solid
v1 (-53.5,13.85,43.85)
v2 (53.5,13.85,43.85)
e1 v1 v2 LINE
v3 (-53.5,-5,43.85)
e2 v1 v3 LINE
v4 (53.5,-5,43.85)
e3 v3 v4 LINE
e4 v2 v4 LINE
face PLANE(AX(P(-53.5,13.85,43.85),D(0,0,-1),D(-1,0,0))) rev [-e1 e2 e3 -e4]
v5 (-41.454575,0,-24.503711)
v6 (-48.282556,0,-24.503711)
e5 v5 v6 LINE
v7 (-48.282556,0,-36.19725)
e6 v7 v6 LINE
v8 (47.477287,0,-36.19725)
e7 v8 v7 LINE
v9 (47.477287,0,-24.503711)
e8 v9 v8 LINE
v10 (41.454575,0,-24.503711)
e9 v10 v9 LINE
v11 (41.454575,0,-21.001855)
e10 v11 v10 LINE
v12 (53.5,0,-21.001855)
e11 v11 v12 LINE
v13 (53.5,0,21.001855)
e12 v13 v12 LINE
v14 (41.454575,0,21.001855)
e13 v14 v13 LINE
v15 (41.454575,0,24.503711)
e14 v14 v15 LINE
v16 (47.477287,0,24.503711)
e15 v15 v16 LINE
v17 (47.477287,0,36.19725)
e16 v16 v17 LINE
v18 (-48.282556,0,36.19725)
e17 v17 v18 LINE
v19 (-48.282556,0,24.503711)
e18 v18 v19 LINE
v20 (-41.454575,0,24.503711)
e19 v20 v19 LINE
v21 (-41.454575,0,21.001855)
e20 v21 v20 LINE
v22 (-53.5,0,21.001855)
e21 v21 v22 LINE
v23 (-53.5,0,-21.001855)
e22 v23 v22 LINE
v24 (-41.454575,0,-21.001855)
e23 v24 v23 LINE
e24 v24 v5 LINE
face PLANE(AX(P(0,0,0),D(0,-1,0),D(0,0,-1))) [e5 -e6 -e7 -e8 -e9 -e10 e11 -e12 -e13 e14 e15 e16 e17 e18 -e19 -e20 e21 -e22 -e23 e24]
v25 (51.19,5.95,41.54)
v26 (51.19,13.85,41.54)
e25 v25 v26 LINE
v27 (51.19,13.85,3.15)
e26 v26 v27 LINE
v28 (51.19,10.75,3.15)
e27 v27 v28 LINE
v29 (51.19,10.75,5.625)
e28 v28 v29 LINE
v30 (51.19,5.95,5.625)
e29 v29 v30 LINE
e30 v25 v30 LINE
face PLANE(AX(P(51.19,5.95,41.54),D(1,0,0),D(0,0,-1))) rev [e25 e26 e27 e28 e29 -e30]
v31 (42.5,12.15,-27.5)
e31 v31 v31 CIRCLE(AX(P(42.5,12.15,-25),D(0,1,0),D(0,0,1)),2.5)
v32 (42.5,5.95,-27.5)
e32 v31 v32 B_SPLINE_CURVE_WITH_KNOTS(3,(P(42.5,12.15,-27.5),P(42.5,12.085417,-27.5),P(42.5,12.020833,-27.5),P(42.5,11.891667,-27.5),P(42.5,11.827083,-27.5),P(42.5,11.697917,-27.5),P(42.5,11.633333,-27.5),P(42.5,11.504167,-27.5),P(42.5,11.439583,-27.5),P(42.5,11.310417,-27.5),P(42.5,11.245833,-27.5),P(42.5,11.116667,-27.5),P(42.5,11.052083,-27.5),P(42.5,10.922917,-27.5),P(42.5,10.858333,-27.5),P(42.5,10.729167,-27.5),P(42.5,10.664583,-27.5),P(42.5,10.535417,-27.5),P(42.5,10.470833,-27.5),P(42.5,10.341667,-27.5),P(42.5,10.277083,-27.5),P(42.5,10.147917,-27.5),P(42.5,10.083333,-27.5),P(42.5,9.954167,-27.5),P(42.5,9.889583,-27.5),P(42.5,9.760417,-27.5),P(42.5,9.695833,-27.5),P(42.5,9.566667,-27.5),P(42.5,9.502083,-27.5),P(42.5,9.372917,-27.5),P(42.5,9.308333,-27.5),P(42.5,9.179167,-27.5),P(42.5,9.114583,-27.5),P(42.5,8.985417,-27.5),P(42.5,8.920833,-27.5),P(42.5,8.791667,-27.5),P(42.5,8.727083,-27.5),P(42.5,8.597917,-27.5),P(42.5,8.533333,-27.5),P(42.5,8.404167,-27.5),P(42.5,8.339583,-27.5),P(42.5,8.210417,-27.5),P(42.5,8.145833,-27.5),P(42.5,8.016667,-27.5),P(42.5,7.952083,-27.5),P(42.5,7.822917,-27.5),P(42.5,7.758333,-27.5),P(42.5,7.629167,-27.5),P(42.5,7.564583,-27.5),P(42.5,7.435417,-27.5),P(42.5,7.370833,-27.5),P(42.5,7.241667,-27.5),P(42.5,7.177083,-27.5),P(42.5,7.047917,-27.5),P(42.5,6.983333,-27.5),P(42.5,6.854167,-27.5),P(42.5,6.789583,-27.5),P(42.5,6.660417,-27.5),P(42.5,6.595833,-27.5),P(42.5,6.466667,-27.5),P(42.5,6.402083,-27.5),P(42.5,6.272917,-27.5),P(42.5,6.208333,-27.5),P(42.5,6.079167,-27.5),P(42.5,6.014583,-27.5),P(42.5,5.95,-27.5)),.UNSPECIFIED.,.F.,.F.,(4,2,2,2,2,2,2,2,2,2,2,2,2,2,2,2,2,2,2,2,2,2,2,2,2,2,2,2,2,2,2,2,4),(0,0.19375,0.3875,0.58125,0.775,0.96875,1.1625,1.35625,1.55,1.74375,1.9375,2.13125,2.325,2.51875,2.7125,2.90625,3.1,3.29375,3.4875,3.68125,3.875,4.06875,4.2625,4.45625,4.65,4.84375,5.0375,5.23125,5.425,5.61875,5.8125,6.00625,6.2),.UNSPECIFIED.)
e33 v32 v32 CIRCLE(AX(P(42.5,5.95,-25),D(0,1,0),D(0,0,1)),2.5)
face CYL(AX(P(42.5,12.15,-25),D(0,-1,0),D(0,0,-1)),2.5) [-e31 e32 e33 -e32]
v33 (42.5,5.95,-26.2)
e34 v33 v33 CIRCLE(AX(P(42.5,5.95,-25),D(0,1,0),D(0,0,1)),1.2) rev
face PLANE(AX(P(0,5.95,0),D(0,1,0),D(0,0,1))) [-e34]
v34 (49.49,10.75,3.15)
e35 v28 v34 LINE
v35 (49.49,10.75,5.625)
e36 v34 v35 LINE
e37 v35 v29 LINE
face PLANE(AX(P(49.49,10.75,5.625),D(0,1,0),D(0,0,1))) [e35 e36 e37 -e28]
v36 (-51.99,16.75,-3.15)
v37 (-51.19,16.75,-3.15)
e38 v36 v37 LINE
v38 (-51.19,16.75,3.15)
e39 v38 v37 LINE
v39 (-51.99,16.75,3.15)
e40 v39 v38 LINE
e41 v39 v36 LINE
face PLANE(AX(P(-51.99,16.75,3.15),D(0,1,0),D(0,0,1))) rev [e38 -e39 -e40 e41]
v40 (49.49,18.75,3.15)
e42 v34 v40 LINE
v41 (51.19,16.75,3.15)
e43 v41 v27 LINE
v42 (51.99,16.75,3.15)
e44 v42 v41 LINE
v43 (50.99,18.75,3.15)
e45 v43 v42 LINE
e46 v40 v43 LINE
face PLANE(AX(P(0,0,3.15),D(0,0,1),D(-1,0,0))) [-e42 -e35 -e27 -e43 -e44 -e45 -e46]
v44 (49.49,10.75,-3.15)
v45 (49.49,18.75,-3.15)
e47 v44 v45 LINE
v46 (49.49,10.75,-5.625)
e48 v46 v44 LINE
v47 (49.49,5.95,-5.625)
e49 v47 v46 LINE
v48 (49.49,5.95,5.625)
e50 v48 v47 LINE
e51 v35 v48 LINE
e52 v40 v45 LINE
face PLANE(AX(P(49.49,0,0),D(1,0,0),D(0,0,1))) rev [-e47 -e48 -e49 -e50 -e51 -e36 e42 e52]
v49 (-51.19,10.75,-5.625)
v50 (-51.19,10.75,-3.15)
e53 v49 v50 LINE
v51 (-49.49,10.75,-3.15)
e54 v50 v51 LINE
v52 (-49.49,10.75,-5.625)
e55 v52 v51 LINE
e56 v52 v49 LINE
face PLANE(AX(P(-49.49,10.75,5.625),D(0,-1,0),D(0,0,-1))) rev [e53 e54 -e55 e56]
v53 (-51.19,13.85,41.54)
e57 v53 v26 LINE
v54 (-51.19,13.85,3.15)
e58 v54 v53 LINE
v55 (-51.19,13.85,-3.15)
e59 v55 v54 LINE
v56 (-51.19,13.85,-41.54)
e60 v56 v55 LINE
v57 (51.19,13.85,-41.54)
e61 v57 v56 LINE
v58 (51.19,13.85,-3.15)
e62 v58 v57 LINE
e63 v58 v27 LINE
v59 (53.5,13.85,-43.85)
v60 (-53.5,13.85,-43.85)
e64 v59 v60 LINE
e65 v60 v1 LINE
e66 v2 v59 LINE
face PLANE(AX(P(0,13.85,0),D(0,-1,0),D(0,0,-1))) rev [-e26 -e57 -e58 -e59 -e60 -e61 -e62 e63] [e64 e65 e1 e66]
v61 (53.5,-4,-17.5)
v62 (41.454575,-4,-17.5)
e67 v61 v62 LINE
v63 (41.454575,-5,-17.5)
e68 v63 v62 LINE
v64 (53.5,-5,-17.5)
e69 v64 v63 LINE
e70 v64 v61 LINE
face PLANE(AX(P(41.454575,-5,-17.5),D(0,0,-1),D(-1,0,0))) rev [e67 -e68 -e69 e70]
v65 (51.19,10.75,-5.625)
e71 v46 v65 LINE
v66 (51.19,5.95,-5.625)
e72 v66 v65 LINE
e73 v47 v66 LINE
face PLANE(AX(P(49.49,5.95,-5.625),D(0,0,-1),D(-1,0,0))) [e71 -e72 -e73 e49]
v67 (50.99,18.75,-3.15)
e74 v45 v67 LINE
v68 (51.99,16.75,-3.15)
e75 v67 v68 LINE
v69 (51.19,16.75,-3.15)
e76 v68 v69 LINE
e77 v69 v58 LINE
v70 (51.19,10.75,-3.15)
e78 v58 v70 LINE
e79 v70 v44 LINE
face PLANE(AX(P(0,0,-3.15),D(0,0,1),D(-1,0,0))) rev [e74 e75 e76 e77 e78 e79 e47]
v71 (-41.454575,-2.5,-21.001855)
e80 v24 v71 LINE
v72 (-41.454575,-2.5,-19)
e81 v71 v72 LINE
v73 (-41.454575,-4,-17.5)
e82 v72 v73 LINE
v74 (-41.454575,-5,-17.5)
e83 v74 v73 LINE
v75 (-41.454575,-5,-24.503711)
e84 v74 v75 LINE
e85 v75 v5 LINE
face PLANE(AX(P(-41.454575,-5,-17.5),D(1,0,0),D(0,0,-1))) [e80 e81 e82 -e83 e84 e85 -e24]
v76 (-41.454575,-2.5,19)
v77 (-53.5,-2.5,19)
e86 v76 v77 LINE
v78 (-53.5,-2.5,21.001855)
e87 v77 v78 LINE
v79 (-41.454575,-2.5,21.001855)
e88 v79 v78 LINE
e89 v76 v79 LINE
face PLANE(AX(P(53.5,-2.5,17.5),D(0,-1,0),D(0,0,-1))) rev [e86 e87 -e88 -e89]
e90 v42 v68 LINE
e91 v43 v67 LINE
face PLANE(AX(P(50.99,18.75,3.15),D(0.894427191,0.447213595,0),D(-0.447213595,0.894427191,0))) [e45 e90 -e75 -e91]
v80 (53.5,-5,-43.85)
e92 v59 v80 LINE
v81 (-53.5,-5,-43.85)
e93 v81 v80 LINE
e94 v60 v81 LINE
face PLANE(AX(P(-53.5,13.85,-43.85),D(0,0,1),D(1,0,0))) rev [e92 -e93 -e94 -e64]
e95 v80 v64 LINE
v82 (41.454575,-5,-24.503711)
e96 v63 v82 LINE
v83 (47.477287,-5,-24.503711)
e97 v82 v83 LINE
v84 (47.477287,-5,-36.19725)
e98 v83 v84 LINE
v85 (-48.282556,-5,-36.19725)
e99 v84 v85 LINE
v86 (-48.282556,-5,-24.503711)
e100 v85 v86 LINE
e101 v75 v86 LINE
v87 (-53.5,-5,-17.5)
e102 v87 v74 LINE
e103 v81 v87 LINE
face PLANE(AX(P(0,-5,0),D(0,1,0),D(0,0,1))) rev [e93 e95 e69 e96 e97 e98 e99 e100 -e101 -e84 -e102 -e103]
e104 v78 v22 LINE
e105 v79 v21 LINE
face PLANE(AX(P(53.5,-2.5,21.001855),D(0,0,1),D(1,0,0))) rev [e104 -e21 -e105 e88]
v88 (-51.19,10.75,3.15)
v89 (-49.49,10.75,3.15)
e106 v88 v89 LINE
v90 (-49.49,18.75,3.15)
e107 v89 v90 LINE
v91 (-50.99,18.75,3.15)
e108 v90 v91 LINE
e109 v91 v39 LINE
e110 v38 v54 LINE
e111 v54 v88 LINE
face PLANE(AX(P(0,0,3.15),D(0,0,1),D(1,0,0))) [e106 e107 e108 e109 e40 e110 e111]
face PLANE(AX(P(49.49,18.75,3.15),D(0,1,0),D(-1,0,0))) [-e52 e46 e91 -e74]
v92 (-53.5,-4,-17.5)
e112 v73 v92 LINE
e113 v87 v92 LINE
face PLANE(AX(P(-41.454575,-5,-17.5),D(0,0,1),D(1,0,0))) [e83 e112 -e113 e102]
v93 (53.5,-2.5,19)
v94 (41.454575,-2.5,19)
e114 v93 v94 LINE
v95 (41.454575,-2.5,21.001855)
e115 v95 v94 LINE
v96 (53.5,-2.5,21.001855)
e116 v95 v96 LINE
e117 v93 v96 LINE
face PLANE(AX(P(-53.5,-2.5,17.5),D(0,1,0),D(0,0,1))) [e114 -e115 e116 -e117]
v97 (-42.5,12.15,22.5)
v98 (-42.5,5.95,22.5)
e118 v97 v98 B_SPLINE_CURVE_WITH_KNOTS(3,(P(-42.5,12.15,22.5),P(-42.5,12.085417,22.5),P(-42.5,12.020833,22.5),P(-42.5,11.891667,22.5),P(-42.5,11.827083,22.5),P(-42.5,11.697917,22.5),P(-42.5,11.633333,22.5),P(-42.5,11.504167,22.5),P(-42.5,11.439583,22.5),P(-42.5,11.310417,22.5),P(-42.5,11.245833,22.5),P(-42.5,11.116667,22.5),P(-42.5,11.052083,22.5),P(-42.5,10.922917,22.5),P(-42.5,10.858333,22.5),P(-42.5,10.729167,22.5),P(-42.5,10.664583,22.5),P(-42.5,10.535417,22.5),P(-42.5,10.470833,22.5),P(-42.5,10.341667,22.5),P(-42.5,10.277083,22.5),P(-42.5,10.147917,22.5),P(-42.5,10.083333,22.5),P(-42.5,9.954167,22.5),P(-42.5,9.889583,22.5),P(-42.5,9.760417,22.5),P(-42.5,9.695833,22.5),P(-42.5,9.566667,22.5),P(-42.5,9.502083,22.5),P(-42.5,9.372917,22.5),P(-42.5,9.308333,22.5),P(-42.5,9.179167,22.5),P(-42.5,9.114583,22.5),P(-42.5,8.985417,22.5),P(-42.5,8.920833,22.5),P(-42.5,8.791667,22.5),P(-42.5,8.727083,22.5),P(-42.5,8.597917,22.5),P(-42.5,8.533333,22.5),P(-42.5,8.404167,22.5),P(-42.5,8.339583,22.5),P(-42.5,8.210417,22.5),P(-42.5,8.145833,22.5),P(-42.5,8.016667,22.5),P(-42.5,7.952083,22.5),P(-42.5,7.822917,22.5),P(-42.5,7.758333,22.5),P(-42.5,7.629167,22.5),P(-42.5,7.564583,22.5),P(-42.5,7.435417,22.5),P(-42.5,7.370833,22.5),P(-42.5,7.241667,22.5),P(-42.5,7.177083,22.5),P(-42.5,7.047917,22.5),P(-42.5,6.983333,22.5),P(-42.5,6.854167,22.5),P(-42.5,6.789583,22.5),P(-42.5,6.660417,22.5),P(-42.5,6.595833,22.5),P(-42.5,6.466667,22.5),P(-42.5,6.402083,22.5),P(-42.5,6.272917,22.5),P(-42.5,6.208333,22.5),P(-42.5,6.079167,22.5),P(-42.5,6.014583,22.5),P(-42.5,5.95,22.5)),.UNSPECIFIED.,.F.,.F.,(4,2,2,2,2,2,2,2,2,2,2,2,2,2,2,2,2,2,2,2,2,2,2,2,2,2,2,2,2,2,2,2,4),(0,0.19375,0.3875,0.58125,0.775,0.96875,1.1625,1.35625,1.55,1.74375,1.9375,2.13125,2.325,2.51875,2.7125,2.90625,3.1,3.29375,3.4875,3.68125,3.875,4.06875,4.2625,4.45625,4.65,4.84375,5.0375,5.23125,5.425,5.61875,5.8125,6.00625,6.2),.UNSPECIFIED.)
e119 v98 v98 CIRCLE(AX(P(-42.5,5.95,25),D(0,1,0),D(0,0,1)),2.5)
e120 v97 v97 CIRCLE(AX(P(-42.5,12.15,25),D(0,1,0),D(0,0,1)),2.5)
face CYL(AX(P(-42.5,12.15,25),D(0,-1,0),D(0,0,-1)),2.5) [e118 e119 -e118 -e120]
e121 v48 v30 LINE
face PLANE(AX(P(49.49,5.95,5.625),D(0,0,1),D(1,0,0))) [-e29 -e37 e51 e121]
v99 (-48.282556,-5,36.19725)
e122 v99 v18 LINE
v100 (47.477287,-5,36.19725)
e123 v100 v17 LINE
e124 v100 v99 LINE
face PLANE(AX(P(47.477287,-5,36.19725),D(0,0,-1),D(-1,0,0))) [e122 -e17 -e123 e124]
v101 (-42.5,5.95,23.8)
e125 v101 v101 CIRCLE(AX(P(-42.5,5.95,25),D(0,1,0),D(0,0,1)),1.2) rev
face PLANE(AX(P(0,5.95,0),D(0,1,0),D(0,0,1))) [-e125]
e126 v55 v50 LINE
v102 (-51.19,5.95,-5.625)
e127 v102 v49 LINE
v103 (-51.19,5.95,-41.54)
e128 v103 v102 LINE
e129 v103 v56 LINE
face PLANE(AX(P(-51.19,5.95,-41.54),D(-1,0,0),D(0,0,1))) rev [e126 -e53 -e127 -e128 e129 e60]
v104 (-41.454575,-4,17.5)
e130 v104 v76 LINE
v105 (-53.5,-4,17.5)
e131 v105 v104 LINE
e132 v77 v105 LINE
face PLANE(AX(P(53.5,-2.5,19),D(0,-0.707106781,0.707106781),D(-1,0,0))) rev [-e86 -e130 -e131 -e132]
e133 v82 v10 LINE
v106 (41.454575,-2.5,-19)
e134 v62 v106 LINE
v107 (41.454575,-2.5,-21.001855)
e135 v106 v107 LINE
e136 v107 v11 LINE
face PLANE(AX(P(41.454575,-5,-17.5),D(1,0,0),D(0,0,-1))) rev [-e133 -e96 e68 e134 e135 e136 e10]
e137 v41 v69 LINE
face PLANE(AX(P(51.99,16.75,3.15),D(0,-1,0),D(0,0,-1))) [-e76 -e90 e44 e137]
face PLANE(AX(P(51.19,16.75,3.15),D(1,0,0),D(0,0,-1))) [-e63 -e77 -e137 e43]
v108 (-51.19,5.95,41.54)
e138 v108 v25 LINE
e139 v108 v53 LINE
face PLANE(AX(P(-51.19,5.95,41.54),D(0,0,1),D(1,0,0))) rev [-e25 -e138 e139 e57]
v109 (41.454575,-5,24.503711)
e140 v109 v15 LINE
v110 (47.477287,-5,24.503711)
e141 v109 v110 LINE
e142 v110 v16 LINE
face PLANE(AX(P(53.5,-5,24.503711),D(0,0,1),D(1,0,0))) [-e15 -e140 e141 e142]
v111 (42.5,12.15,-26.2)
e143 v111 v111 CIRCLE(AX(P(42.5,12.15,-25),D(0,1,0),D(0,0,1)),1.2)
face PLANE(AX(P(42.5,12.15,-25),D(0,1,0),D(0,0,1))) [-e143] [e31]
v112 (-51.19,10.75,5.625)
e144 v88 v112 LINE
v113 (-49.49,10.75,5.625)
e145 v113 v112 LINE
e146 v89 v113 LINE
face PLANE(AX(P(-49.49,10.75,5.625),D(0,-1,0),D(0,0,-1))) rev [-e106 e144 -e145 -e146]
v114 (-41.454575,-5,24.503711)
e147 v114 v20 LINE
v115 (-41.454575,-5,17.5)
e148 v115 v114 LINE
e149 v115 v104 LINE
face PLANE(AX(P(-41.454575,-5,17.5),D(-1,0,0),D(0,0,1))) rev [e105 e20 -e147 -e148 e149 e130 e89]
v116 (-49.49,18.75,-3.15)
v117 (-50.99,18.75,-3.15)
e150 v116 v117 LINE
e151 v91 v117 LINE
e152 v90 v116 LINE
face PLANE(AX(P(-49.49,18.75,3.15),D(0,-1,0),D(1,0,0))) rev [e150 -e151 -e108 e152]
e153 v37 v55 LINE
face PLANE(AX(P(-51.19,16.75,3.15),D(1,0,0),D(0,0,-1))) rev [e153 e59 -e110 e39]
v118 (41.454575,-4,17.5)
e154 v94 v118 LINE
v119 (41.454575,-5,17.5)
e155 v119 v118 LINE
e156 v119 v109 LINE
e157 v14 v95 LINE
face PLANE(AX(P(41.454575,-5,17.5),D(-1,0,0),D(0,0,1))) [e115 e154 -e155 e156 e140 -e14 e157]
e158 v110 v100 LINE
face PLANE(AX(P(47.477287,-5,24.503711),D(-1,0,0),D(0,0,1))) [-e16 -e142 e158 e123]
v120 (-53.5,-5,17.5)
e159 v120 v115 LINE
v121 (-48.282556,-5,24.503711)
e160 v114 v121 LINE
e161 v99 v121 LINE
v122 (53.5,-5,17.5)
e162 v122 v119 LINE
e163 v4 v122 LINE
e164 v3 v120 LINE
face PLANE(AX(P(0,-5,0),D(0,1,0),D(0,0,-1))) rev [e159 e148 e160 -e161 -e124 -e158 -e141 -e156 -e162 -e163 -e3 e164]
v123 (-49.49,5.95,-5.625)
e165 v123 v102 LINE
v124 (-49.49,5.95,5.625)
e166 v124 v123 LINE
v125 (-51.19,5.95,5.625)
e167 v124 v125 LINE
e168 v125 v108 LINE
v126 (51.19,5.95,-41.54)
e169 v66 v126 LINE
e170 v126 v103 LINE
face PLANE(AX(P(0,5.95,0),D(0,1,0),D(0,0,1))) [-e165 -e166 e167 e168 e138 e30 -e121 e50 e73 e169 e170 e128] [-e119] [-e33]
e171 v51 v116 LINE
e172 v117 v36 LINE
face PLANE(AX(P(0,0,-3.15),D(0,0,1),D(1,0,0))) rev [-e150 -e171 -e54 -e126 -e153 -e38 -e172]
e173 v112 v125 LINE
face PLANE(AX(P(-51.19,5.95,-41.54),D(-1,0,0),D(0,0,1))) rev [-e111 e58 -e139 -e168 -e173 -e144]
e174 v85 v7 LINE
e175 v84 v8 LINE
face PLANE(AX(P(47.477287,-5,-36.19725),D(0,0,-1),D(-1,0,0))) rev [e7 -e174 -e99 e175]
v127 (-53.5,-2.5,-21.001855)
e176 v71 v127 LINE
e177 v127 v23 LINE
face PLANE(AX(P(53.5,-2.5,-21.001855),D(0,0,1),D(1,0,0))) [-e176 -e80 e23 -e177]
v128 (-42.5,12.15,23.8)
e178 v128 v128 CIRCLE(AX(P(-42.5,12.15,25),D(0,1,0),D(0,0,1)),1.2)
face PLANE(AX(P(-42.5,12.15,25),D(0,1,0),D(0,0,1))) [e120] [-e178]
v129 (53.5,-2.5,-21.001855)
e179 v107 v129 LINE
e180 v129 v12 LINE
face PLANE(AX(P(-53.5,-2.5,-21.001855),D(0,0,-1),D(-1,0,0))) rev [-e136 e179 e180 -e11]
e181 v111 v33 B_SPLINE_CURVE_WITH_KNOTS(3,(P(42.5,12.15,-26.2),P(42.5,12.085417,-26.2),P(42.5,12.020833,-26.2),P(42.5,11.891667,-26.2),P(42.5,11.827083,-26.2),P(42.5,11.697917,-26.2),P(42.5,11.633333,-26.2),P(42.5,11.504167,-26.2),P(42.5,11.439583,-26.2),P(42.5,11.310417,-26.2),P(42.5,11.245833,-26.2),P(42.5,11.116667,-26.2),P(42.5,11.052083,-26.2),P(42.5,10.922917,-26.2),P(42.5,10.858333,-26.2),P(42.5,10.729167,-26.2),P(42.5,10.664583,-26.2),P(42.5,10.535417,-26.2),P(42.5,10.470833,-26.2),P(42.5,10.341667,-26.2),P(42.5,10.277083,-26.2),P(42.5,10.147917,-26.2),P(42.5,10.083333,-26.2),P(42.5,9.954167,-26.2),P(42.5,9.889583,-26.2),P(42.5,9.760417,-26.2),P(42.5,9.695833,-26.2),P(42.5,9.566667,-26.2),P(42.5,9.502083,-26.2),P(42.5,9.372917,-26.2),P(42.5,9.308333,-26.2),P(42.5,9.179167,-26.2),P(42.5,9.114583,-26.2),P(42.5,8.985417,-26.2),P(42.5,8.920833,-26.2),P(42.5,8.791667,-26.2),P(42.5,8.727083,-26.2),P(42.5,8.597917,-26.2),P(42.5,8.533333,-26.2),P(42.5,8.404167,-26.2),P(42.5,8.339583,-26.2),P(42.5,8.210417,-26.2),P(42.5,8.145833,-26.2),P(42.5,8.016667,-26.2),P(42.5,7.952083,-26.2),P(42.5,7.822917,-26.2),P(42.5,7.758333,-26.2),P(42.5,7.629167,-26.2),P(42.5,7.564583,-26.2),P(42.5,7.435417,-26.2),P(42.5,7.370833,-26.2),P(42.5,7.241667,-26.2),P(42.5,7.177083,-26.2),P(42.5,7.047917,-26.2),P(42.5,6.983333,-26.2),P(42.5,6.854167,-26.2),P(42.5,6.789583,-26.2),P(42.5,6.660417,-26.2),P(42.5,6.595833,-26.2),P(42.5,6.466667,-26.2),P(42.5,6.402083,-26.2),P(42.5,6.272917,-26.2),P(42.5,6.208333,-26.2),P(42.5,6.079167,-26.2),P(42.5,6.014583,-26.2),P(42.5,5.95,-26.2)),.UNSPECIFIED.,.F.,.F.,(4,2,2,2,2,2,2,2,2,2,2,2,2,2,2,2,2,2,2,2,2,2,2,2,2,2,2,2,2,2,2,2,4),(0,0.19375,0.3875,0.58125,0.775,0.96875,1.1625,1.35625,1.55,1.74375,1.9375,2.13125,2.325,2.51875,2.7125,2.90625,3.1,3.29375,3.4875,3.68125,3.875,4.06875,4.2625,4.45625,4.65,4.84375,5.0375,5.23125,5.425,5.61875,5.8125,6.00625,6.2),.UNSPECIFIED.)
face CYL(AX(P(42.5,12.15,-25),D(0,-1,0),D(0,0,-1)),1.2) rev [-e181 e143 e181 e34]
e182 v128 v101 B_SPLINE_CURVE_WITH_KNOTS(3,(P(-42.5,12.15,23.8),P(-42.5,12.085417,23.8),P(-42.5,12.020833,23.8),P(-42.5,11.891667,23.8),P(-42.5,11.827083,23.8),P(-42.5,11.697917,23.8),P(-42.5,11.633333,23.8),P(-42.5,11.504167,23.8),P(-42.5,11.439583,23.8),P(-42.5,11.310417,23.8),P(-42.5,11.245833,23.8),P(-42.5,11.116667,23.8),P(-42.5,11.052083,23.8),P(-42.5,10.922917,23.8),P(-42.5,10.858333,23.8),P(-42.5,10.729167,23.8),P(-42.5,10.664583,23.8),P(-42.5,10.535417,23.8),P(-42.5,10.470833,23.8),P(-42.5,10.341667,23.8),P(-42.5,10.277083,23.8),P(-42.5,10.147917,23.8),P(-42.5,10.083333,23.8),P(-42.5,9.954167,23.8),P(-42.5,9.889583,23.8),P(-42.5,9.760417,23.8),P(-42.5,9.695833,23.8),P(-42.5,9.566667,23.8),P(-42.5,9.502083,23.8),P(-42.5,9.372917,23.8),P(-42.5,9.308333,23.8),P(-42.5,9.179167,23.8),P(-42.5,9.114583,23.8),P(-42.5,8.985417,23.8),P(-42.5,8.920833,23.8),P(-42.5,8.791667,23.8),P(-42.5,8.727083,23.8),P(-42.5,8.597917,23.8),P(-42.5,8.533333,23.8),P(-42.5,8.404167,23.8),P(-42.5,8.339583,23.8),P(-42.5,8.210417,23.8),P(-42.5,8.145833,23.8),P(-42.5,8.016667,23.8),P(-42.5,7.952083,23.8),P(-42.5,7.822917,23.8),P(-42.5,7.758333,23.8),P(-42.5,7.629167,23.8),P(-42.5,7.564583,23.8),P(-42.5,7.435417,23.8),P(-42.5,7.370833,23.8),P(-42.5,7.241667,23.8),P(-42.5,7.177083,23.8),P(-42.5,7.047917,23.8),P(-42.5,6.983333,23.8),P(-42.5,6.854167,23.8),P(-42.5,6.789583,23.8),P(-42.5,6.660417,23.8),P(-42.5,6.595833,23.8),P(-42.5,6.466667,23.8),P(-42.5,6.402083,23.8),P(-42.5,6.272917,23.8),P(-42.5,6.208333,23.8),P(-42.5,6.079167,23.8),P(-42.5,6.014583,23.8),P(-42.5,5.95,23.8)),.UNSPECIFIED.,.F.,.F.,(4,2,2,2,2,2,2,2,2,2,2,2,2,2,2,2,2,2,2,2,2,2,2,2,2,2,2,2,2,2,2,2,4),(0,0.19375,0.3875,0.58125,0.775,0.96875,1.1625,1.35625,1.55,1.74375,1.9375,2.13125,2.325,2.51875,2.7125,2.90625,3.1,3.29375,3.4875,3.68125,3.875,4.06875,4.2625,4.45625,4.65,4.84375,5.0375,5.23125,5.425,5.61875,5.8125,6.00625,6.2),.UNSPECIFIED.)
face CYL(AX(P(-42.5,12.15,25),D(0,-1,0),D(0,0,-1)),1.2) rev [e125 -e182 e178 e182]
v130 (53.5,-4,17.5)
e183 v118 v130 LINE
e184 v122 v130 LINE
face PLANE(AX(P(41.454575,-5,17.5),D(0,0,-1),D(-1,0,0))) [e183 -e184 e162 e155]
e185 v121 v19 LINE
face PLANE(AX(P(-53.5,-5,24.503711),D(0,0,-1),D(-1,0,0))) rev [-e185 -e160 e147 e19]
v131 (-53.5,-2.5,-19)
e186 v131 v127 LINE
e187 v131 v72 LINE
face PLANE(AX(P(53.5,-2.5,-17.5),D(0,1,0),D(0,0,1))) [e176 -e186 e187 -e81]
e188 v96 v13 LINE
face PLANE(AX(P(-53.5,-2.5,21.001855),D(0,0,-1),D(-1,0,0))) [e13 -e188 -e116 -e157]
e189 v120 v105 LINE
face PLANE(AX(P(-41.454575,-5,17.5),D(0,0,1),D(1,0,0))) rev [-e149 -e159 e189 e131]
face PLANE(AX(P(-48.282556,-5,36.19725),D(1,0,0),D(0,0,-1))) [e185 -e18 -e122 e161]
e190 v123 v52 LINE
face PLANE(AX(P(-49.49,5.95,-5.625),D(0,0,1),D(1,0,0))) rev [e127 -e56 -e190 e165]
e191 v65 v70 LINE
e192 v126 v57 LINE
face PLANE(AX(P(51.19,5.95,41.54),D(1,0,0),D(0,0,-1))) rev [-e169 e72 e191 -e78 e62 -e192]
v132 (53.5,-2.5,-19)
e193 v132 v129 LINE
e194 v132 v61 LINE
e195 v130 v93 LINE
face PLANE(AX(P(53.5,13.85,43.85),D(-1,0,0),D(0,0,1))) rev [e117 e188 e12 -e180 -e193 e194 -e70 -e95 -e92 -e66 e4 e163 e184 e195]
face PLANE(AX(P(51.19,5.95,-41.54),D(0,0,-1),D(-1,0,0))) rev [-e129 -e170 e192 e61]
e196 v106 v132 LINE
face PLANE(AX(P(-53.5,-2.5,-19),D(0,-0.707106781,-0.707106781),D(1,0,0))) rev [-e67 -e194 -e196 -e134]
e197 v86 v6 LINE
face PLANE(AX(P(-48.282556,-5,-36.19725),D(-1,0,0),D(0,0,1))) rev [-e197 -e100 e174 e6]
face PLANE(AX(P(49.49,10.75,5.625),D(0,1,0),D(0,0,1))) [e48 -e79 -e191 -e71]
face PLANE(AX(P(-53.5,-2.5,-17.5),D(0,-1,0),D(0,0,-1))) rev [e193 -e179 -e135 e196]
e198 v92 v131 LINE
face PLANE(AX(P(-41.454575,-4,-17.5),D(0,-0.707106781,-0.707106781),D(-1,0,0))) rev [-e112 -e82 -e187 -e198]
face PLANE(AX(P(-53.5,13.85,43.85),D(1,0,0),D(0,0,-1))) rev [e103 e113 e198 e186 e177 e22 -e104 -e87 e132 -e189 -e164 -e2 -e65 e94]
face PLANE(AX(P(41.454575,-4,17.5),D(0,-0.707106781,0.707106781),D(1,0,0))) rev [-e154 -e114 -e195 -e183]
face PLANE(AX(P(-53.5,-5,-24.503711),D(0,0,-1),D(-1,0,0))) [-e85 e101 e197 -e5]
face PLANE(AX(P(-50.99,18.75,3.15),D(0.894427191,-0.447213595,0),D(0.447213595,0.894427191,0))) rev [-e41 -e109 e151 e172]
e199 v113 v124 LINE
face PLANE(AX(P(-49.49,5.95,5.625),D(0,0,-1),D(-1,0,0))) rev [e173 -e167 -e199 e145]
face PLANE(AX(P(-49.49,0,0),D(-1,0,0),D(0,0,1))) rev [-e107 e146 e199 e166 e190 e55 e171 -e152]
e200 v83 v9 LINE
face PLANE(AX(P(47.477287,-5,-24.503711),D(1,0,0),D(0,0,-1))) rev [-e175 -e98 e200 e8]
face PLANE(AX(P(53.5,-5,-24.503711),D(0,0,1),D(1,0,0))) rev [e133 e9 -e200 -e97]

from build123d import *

# Parameters (mm, degrees)
SKETCH1_W                = 107
SKETCH1_H                = 87.7
BOSS_EXTRUDE1_DEPTH      = 13.85
SKETCH2_W                = 102.38
SKETCH2_H                = 83.08
CUT_EXTRUDE1_DEPTH       = 7.9
SKETCH4_R                = 2.5
SKETCH4_R_2              = 1.2
BOSS_EXTRUDE2_DEPTH      = 6.2
SKETCH7_W                = 11.25
SKETCH7_H                = 4.8
BOSS_EXTRUDE3_DEPTH      = 1.7
BOSS_EXTRUDE4_DEPTH      = 3.15
SKETCH9_W                = 12.045425082
SKETCH9_H                = 7.003710523
BOSS_EXTRUDE9_DEPTH      = 5
SKETCH14_W               = 3.501855262
SKETCH14_H               = 2.5
CUT_EXTRUDE6_DEPTH       = 118.146852284
CHAMFER1_SIZE            = 1.5
CHAMFER1_OF_MIRROR4_SIZE = 1.5
MIRROR5_START            = -53.5
MIRROR5_DEPTH            = 12.045425082
BOSS_EXTRUDE10_DEPTH     = 5


# Read off the part's stored shape, not the designer's step: Mirror5
with BuildPart() as part:
    # Sketch1 → Boss-Extrude1 (new body)
    with BuildSketch(Plane(origin=(0, 0, 0), x_dir=(1, 0, 0), z_dir=(0, 1, 0))):
        Rectangle(SKETCH1_W, SKETCH1_H)
    extrude(amount=BOSS_EXTRUDE1_DEPTH)

    # Sketch2 → Cut-Extrude1 (cut)
    with BuildSketch(Plane(origin=(0, 13.85, 0), x_dir=(1, 0, 0), z_dir=(0, 1, 0))):
        Rectangle(SKETCH2_W, SKETCH2_H)
    extrude(amount=-CUT_EXTRUDE1_DEPTH, mode=Mode.SUBTRACT)

    # Sketch4 → Boss-Extrude2 (add)
    # profile 1 of 2: a face of its own
    with BuildSketch(Plane(origin=(0, 5.95, 0), x_dir=(1, 0, 0), z_dir=(0, 1, 0))):
        with Locations(Location((-42.5, -25, 0), (0, 0, 90))):
            Circle(SKETCH4_R)
        with Locations(Location((-42.5, -25, 0), (0, 0, 90))):
            Circle(SKETCH4_R_2, mode=Mode.SUBTRACT)
    # profile 2 of 2: a face of its own
    with BuildSketch(Plane(origin=(0, 5.95, 0), x_dir=(1, 0, 0), z_dir=(0, 1, 0))):
        with Locations(Location((42.5, 25, 0), (0, 0, 90))):
            Circle(SKETCH4_R)
        with Locations(Location((42.5, 25, 0), (0, 0, 90))):
            Circle(SKETCH4_R_2, mode=Mode.SUBTRACT)
    extrude(amount=BOSS_EXTRUDE2_DEPTH)

    # Sketch7 → Boss-Extrude3 (add)
    with BuildSketch(Plane(origin=(-51.19, 0, 0), x_dir=(0, 0, -1), z_dir=(1, 0, 0))):
        with Locations((0, 8.35)):
            Rectangle(SKETCH7_W, SKETCH7_H)
    boss_extrude3 = extrude(amount=BOSS_EXTRUDE3_DEPTH)

    # Sketch8 → Boss-Extrude4 (add, symmetric)
    with BuildSketch(Plane.XY):
        Polygon((-49.49, 10.75), (-49.49, 18.75), (-50.99, 18.75), (-51.99, 16.75), (-51.19, 16.75), (-51.19, 10.75), align=None)
    boss_extrude4 = extrude(amount=BOSS_EXTRUDE4_DEPTH, both=True)

    # Mirror1: Boss-Extrude3, Boss-Extrude4 across plane
    add(boss_extrude3.mirror(Plane(origin=(0, 0, 0), x_dir=(0, 0, 1), z_dir=(1, 0, 0))))
    add(boss_extrude4.mirror(Plane(origin=(0, 0, 0), x_dir=(0, 0, 1), z_dir=(1, 0, 0))))

    # Sketch9 → Boss-Extrude9 (add)
    with BuildSketch(Plane.XZ):
        with Locations((47.477287459, -21.001855262)):
            Rectangle(SKETCH9_W, SKETCH9_H)
    boss_extrude9 = extrude(amount=BOSS_EXTRUDE9_DEPTH)

    # Sketch14 → Cut-Extrude6 (cut, through all)
    with BuildSketch(Plane(origin=(53.5, 0, 0), x_dir=(0, 0, -1), z_dir=(1, 0, 0))):
        with Locations((19.250927631, -1.25)):
            Rectangle(SKETCH14_W, SKETCH14_H)
    cut_extrude6 = extrude(amount=-CUT_EXTRUDE6_DEPTH, mode=Mode.SUBTRACT)

    # Chamfer1
    chamfer1_edges = [part.edges().sort_by_distance(p)[0] for p in [
        (47.477287459, -2.5, -17.5),
    ]]
    chamfer(chamfer1_edges, length=CHAMFER1_SIZE)

    # Mirror4: Boss-Extrude9, Cut-Extrude6 across plane
    add(boss_extrude9.mirror(Plane.XY))
    add(cut_extrude6.mirror(Plane.XY), mode=Mode.SUBTRACT)

    # Chamfer1 of Mirror4
    chamfer1_of_mirror4_edges = [part.edges().sort_by_distance(p)[0] for p in [
        (47.477287459, -2.5, 17.5),
    ]]
    chamfer(chamfer1_of_mirror4_edges, length=CHAMFER1_OF_MIRROR4_SIZE)

    # Mirror5 outline → Mirror5 (add)
    with BuildSketch(Plane.YZ.offset(MIRROR5_START)):
        Polygon((-2.5, -19), (-4, -17.5), (-5, -17.5), (-5, -24.503710523), (0, -24.503710523), (0, -21.001855262), (-2.5, -21.001855262), align=None)
        Polygon((-2.5, 21.001855262), (0, 21.001855262), (0, 24.503710523), (-5, 24.503710523), (-5, 17.5), (-4, 17.5), (-2.5, 19), align=None)
    extrude(amount=MIRROR5_DEPTH)

    # Sketch15 → Boss-Extrude10 (add)
    with BuildSketch(Plane(origin=(0, 0, 0), x_dir=(-1, 0, 0), z_dir=(0, -1, 0))):
        Polygon((-47.477287459, 24.503710523), (-47.477287459, 36.197250384), (48.282556023, 36.197250384), (48.282556023, 24.503710523), (53.5, 24.503710523), (53.5, 43.85), (-53.5, 43.85), (-53.5, 24.503710523), align=None)
    boss_extrude10 = extrude(amount=BOSS_EXTRUDE10_DEPTH)

    # Mirror6: Boss-Extrude10 across plane
    add(boss_extrude10.mirror(Plane.XY))


solid = part.part
